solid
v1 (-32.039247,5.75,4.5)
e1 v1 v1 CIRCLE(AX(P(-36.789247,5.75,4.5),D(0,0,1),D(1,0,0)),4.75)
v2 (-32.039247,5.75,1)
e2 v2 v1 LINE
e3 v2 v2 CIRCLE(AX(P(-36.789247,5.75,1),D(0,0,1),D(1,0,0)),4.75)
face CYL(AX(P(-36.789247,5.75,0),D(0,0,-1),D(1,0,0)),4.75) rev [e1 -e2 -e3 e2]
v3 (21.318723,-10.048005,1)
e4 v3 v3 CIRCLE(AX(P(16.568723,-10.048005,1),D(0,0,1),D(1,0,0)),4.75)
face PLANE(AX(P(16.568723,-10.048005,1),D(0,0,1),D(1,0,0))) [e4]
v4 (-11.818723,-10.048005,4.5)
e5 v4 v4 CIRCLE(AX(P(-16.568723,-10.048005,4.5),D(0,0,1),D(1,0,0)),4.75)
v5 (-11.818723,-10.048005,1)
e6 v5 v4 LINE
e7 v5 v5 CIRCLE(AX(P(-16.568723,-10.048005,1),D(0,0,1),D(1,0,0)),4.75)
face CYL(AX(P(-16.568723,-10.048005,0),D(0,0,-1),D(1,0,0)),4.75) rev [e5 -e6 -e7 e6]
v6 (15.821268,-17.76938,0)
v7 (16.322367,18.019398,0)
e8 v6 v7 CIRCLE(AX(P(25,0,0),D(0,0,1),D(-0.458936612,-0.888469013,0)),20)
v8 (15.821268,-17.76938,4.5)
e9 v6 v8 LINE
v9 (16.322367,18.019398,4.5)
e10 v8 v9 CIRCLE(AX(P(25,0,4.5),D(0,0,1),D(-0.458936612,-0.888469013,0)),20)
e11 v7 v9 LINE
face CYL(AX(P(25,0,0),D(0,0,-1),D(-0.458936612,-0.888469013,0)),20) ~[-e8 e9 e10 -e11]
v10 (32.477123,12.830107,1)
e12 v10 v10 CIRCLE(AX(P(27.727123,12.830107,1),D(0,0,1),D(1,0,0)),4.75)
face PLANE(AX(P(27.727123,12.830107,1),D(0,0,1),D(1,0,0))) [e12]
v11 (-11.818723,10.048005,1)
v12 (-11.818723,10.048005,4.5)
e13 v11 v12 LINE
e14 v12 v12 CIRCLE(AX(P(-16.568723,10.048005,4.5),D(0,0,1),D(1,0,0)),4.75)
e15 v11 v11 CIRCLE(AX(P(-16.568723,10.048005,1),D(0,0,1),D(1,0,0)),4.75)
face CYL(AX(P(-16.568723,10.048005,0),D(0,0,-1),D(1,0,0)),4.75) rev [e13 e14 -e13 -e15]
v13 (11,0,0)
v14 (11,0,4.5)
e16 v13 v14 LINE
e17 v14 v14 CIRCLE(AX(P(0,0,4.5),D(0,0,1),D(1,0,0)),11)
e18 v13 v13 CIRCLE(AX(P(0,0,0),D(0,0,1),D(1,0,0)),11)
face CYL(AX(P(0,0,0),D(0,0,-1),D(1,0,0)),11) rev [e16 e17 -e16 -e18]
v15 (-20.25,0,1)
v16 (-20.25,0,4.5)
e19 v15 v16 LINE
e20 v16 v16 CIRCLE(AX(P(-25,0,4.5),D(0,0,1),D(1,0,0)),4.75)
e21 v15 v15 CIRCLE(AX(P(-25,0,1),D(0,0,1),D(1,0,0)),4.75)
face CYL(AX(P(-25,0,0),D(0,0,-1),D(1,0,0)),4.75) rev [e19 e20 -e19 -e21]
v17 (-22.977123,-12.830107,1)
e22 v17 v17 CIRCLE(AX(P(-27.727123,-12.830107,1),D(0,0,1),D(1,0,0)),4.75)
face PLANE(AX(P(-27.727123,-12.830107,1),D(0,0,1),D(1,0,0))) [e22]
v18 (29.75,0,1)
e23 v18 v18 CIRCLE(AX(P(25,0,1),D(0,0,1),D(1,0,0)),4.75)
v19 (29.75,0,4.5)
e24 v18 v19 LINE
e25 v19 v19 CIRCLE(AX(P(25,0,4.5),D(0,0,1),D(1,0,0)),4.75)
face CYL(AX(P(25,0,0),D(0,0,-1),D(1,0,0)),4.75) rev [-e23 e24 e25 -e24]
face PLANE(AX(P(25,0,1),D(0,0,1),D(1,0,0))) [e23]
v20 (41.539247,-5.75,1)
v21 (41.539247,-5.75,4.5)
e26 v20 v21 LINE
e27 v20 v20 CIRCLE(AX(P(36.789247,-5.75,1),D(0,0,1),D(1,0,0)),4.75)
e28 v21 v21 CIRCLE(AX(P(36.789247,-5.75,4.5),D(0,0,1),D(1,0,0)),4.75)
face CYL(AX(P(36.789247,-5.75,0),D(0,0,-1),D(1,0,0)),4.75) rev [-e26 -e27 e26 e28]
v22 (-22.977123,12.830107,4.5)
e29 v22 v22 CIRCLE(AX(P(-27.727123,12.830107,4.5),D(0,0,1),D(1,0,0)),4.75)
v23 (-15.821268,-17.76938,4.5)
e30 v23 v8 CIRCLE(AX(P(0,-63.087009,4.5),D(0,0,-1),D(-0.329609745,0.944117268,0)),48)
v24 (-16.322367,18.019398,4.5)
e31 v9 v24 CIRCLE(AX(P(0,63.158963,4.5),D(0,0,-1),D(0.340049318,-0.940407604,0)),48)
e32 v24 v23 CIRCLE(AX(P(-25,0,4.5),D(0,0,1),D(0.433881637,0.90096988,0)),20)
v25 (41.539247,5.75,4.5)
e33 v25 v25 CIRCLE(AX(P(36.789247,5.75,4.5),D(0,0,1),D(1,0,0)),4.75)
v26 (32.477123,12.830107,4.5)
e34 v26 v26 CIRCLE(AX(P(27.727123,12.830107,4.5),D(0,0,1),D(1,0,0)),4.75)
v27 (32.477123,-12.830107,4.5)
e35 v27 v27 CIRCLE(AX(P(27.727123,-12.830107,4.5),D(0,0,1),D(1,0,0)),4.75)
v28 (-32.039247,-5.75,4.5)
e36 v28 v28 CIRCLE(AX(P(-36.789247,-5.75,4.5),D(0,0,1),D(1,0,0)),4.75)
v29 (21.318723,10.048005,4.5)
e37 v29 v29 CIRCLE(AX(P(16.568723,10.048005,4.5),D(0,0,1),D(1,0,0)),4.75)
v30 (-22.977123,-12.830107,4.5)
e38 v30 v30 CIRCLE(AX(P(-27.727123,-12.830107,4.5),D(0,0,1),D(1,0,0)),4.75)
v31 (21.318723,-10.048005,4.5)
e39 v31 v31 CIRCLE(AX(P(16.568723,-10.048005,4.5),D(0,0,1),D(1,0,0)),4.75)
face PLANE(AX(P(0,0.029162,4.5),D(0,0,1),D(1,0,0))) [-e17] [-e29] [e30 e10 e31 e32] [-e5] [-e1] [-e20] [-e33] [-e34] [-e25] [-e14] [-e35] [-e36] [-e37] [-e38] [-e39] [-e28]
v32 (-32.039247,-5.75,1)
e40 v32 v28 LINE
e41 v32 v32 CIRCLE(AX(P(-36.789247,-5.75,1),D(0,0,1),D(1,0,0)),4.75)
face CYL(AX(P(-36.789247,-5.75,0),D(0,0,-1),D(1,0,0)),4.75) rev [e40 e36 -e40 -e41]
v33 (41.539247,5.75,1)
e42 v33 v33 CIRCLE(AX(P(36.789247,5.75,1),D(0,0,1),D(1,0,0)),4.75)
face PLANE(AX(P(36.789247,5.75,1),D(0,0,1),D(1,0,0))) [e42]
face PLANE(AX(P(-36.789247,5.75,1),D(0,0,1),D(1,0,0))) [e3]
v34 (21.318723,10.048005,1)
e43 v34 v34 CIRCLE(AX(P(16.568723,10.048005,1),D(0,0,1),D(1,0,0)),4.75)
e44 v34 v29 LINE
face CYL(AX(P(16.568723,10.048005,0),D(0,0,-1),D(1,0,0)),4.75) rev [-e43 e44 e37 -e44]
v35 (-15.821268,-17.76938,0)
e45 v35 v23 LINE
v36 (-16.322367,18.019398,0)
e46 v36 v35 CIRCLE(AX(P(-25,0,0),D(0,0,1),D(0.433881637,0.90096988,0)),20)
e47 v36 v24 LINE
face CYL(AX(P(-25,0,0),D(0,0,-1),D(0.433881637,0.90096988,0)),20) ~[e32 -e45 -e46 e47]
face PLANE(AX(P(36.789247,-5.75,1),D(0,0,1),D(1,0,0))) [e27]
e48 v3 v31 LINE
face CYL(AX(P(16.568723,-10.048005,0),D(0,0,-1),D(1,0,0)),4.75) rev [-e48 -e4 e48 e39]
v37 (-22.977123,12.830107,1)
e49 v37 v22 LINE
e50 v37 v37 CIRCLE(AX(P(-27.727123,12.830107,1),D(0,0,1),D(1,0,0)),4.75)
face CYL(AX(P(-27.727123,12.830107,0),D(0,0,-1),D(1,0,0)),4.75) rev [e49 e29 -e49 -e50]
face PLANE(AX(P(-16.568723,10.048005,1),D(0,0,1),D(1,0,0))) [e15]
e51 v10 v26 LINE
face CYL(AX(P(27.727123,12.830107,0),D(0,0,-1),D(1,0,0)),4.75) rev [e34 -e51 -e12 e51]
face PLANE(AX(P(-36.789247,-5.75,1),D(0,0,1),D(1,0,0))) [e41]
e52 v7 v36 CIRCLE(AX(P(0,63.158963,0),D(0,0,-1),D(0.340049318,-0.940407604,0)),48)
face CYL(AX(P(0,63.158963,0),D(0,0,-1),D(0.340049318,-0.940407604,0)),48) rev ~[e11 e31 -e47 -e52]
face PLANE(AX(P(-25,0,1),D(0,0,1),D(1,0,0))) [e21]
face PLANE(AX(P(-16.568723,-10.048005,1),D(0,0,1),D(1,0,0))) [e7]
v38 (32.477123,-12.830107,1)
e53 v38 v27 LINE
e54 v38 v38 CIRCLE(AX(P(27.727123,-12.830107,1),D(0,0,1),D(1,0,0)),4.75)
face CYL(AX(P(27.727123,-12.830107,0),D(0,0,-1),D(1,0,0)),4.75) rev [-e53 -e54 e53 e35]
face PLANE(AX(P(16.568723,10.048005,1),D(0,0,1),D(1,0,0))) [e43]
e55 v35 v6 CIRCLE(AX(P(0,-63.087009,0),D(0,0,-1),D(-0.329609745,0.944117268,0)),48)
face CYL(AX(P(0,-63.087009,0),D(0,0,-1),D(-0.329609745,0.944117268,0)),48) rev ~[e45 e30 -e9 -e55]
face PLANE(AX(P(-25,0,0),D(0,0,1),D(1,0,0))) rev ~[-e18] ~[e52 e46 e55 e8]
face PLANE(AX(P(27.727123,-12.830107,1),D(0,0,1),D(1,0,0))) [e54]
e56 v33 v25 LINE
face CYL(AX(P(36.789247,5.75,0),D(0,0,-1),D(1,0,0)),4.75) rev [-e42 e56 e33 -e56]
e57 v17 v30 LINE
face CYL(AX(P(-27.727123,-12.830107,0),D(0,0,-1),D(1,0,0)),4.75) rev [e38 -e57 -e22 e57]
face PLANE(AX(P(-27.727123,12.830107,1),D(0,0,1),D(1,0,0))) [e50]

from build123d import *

# Parameters (mm, degrees)
F0_R     = 4.75
F0_R_2   = 11
F1_DEPTH = 4.5
F2_DEPTH = 1


# Not quite as in the source:
# - a feature names something its author has since deleted; it is built from what else it names


with BuildPart() as f1:
    # F0 (on Top) → F1 (new body)
    with BuildSketch(Plane.XY):
        with BuildLine():
            ThreePointArc((-15.8212677669, -17.7693802535), (0, -15.0870091218), (15.8212677669, -17.7693802535))
            ThreePointArc((15.8212677669, -17.7693802535), (44.9980398453, -0.2800041916), (16.3223672692, 18.019397609))
            ThreePointArc((16.3223672692, 18.019397609), (0, 15.1589625906), (-16.3223672692, 18.019397609))
            ThreePointArc((-16.3223672692, 18.019397609), (-44.9980398453, -0.2800041916), (-15.8212677669, -17.7693802535))
        make_face()
        with Locations((-27.7271234226, -12.8301069662)):
            Circle(F0_R, mode=Mode.SUBTRACT)
        with Locations((-16.5687225704, -10.0480051668)):
            Circle(F0_R, mode=Mode.SUBTRACT)
        with Locations((-36.7892470891, -5.75)):
            Circle(F0_R, mode=Mode.SUBTRACT)
        with Locations((16.5687225704, -10.0480051668)):
            Circle(F0_R, mode=Mode.SUBTRACT)
        with Locations((27.7271234226, -12.8301069662)):
            Circle(F0_R, mode=Mode.SUBTRACT)
        with Locations((36.7892470891, -5.75)):
            Circle(F0_R, mode=Mode.SUBTRACT)
        with Locations((-25, 0)):
            Circle(F0_R, mode=Mode.SUBTRACT)
        with Locations((-36.7892470891, 5.75)):
            Circle(F0_R, mode=Mode.SUBTRACT)
        with Locations((-27.7271234226, 12.8301069662)):
            Circle(F0_R, mode=Mode.SUBTRACT)
        with Locations((-16.5687225704, 10.0480051668)):
            Circle(F0_R, mode=Mode.SUBTRACT)
        Circle(F0_R_2, mode=Mode.SUBTRACT)
        with Locations((25, 0)):
            Circle(F0_R, mode=Mode.SUBTRACT)
        with Locations((36.7892470891, 5.75)):
            Circle(F0_R, mode=Mode.SUBTRACT)
        with Locations((16.5687225704, 10.0480051668)):
            Circle(F0_R, mode=Mode.SUBTRACT)
        with Locations((27.7271234226, 12.8301069662)):
            Circle(F0_R, mode=Mode.SUBTRACT)
    extrude(amount=F1_DEPTH)

    # F0 (on Top) → F2 (join)
    with BuildSketch(Plane.XY):
        with Locations((-25, 0)):
            Circle(F0_R)
        with Locations((25, 0)):
            Circle(F0_R)
        with Locations((-16.5687225704, 10.0480051668)):
            Circle(F0_R)
        with Locations((-27.7271234226, 12.8301069662)):
            Circle(F0_R)
        with Locations((-36.7892470891, 5.75)):
            Circle(F0_R)
        with Locations((-36.7892470891, -5.75)):
            Circle(F0_R)
        with Locations((-27.7271234226, -12.8301069662)):
            Circle(F0_R)
        with Locations((-16.5687225704, -10.0480051668)):
            Circle(F0_R)
        with Locations((16.5687225704, 10.0480051668)):
            Circle(F0_R)
        with Locations((27.7271234226, 12.8301069662)):
            Circle(F0_R)
        with Locations((36.7892470891, 5.75)):
            Circle(F0_R)
        with Locations((36.7892470891, -5.75)):
            Circle(F0_R)
        with Locations((27.7271234226, -12.8301069662)):
            Circle(F0_R)
        with Locations((16.5687225704, -10.0480051668)):
            Circle(F0_R)
    extrude(amount=F2_DEPTH)


solid = f1.part
